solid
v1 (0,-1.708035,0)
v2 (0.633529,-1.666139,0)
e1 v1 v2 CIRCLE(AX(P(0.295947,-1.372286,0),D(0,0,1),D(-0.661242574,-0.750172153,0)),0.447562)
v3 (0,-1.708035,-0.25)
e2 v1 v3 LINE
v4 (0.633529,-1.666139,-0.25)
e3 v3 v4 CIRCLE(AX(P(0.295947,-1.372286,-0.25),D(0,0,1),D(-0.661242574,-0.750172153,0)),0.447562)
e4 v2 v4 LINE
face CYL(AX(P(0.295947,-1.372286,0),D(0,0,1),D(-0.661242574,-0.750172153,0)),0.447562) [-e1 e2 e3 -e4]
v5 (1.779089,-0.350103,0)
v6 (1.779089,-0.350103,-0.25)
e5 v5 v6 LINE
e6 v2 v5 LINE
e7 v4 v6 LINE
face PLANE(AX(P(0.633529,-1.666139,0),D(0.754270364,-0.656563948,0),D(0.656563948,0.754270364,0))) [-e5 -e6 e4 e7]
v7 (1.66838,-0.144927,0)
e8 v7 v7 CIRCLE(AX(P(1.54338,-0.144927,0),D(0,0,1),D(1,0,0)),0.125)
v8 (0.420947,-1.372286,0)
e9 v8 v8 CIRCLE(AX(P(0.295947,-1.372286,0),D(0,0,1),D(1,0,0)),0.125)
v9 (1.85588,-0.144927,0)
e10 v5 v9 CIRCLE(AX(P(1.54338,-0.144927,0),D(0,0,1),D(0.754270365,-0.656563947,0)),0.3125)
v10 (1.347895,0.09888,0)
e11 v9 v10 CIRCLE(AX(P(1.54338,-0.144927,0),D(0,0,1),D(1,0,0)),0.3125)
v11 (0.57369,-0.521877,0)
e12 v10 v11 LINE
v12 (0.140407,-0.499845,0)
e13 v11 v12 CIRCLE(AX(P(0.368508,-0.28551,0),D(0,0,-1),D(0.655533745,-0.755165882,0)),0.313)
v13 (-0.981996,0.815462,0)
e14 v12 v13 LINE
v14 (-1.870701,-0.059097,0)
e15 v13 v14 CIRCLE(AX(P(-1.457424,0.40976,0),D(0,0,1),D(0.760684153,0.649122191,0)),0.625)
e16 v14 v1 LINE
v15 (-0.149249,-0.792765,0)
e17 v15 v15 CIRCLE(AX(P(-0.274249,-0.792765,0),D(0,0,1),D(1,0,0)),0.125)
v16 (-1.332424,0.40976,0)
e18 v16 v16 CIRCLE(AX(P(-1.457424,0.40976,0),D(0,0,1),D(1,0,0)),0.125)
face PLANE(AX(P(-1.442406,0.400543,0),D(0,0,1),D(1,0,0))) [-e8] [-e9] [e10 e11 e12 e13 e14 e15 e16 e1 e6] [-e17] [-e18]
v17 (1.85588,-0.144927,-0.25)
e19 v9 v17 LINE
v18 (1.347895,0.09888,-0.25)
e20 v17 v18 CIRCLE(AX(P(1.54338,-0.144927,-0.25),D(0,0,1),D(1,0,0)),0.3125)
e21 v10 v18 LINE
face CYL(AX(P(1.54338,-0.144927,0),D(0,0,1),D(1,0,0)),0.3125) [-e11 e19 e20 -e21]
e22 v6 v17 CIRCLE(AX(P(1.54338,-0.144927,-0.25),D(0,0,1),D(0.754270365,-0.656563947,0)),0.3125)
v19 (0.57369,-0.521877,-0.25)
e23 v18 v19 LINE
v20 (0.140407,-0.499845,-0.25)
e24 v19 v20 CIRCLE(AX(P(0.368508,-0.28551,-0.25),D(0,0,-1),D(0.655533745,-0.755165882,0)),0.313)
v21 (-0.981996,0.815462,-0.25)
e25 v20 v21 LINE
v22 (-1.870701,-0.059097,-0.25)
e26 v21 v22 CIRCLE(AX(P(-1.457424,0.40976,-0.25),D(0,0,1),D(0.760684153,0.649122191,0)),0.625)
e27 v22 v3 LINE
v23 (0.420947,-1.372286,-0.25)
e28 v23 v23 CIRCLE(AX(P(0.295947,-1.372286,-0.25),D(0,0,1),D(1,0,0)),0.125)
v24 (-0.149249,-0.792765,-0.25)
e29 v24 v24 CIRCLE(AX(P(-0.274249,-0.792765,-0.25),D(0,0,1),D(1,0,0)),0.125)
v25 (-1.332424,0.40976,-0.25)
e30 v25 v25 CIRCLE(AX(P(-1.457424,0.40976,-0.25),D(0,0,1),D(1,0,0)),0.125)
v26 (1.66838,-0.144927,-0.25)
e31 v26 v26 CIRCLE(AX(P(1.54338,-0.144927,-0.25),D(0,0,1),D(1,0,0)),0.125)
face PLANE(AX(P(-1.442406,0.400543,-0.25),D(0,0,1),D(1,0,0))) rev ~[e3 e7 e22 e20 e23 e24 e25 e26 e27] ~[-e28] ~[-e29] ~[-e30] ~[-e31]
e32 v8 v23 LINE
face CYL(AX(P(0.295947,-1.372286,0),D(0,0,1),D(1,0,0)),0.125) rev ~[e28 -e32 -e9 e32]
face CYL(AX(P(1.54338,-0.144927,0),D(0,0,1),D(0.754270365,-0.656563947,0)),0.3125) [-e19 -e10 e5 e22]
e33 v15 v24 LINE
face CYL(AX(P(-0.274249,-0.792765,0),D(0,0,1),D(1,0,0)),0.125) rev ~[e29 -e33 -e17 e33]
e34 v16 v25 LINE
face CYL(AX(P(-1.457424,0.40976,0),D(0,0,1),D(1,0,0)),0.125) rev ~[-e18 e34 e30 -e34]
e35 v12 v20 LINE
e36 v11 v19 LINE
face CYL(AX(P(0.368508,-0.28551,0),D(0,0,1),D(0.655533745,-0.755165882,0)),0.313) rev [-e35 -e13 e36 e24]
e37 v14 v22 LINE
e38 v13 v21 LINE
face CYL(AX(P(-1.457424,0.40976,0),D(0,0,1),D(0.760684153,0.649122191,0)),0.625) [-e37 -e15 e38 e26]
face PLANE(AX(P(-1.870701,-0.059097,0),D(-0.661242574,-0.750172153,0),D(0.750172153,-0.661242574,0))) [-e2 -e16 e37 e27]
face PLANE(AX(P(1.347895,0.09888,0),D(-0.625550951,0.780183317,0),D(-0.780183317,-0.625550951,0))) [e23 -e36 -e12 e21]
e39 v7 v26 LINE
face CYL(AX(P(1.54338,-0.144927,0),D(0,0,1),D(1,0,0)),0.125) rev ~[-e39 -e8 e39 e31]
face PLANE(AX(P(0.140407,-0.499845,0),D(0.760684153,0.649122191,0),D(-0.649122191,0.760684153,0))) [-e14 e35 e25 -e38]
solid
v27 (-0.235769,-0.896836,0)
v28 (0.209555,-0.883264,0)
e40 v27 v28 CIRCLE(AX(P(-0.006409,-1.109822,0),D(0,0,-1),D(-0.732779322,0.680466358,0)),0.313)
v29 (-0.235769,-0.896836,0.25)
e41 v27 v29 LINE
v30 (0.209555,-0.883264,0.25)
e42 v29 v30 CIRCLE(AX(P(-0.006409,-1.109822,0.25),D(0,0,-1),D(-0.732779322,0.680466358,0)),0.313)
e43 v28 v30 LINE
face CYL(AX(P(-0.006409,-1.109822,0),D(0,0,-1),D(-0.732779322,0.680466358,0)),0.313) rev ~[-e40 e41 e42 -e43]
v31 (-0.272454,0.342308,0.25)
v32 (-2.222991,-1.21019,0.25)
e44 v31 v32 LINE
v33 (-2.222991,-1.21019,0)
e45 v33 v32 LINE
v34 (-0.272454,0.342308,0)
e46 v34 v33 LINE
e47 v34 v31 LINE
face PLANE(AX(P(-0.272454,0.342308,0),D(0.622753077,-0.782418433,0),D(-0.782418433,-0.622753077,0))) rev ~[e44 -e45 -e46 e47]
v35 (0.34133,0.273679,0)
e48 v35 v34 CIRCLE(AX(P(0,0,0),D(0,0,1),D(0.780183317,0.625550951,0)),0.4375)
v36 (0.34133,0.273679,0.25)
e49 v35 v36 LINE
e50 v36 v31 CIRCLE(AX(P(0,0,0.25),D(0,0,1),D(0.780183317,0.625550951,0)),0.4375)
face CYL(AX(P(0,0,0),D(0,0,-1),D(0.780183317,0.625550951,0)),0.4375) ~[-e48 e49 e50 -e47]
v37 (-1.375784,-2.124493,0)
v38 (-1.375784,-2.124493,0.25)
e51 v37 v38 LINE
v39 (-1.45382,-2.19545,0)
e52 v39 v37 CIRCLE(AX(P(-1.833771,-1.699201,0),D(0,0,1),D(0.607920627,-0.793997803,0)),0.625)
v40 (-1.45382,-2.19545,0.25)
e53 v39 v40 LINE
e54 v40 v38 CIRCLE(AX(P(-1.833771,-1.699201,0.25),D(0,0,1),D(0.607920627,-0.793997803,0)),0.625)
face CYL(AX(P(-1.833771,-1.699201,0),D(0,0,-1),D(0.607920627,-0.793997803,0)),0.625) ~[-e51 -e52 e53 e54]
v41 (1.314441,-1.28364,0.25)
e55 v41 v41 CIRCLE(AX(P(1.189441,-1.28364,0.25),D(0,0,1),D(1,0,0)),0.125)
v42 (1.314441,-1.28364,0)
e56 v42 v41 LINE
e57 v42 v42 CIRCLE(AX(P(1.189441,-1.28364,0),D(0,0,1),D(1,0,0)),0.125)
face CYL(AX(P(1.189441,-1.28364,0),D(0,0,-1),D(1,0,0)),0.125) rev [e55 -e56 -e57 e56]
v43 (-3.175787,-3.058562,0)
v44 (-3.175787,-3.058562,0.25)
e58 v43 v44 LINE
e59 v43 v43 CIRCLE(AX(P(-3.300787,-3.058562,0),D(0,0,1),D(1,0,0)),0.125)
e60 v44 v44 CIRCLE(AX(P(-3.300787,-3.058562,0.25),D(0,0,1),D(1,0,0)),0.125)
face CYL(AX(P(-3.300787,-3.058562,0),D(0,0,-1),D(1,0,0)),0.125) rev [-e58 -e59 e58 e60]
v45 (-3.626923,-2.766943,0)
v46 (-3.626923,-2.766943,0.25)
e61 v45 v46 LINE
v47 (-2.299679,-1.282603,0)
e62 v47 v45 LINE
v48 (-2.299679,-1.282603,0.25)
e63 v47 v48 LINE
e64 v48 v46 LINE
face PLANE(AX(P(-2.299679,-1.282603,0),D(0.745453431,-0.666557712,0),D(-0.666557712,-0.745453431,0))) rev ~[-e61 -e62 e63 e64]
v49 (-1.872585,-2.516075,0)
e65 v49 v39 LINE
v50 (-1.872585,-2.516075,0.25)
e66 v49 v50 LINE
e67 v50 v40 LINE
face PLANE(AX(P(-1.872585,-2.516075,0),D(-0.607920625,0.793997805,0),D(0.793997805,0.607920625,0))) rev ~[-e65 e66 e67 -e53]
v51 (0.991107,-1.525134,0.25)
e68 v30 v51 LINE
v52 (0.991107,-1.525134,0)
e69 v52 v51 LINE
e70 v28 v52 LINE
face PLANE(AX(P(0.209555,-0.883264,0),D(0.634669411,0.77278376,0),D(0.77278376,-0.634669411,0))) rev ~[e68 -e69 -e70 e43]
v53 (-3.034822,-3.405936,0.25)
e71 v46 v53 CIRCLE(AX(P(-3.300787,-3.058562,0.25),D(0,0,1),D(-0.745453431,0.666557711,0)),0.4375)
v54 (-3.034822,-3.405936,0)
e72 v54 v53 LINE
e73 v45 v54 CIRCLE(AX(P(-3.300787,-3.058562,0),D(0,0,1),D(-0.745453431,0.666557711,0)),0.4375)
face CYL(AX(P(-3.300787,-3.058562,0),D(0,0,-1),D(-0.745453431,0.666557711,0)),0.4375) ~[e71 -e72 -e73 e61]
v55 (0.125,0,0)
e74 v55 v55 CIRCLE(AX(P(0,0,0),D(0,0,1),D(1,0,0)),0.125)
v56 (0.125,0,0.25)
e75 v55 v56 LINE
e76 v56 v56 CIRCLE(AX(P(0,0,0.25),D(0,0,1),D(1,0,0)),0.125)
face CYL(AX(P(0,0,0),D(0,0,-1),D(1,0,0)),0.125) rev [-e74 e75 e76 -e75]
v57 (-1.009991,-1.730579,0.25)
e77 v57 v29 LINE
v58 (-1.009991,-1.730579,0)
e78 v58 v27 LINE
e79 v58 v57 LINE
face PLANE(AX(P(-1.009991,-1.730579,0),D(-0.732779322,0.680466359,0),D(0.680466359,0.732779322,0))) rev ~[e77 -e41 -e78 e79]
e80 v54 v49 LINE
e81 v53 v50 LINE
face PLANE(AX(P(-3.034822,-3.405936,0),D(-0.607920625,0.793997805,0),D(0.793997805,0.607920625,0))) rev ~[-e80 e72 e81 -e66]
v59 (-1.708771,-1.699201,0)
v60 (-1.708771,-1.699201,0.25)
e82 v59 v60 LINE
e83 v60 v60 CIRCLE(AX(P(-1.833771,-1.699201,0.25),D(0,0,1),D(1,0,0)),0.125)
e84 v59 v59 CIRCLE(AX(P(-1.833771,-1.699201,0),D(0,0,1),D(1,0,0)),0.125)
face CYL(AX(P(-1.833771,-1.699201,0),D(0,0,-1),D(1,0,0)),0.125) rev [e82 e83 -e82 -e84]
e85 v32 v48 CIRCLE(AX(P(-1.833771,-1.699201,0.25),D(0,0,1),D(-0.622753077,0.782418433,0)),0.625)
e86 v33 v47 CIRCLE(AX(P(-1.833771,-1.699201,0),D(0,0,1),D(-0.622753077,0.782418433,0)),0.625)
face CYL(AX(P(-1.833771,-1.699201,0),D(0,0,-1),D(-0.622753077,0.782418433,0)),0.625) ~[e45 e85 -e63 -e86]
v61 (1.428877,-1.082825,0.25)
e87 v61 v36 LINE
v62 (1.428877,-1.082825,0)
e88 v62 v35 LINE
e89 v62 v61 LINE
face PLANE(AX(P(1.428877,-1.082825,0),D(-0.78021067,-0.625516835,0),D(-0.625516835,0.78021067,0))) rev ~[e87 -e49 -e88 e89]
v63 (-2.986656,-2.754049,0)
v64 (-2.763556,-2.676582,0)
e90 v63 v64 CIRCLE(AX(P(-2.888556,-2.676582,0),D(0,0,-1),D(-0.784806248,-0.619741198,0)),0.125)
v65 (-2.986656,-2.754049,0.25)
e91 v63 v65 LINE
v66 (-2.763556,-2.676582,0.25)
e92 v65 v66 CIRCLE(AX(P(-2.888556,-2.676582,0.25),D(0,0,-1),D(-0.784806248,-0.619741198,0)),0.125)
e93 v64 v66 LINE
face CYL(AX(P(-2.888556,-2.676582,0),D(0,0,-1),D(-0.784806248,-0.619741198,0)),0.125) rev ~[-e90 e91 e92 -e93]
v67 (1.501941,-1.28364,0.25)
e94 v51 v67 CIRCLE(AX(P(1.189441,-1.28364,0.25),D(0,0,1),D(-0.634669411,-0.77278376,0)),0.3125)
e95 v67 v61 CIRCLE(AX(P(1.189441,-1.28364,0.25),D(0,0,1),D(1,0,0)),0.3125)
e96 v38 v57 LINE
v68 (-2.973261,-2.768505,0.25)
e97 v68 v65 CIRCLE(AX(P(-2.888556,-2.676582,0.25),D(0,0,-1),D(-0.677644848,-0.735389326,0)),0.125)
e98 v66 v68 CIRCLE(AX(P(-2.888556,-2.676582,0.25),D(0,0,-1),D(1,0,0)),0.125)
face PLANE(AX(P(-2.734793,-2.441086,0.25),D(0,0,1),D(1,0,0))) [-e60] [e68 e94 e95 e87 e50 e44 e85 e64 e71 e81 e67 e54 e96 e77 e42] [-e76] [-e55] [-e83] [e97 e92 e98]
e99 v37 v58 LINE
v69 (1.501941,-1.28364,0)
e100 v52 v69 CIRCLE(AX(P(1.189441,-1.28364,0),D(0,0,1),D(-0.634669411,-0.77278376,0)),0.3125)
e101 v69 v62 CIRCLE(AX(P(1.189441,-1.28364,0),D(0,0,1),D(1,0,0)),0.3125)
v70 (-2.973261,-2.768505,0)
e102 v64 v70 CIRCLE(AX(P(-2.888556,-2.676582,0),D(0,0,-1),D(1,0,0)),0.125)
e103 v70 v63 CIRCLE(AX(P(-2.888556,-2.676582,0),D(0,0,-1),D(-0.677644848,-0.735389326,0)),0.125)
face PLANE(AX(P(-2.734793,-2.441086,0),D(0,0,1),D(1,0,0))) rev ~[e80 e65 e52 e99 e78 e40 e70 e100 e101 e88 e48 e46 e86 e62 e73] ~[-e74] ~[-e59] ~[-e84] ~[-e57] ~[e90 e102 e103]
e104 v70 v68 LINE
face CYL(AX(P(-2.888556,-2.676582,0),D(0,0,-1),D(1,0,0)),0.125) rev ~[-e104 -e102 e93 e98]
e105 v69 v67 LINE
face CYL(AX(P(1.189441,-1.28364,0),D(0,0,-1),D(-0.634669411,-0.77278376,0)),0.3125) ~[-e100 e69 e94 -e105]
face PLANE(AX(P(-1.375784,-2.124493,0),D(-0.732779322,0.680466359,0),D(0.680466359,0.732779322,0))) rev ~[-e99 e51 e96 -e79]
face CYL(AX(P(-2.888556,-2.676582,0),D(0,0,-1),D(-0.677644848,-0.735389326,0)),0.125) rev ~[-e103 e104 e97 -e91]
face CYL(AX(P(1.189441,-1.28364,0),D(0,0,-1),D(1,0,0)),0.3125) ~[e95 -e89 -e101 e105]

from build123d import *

# Parameters (mm, degrees)
F0_R     = 0.125
F1_DEPTH = 0.25
F2_R     = 0.125
F3_DEPTH = 0.25


# Not quite as in the source:
# - ends of sketch curves that miss each other by under 0.0002 mm in the source are joined


with BuildPart() as f1:
    # F0 (on Top) → F1 (new body)
    with BuildSketch(Plane.XY):
        with BuildLine():
            Line((-2.2996791372, -1.2826026726), (-3.6269232135, -2.7669432373))
            ThreePointArc((-3.6269232135, -2.7669432373), (-3.3095959941, -2.6211509221), (-2.9866564556, -2.7540494466))
            ThreePointArc((-2.9866564556, -2.7540494466), (-2.929558128, -2.5584979333), (-2.7635556745, -2.6765817968))
            ThreePointArc((-2.7635556745, -2.6765817968), (-2.8383720153, -2.7910658584), (-2.9732612801, -2.7685054629))
            ThreePointArc((-2.9732612801, -2.7685054629), (-2.8917036664, -2.9034596896), (-2.8632873376, -3.0585622361))
            ThreePointArc((-2.8632873376, -3.0585622361), (-2.9085080639, -3.2522713516), (-3.0348220642, -3.4059362756))
            Line((-3.0348220642, -3.4059362756), (-1.8725849919, -2.5160750152))
            Line((-1.8725849919, -2.5160750152), (-2.2590622172, -2.1571883185))
            ThreePointArc((-2.2590622172, -2.1571883185), (-2.4580978323, -1.7281958222), (-2.2996791372, -1.2826026726))
        make_face()
        with BuildLine():
            ThreePointArc((-2.9866564556, -2.7540494466), (-3.3095959941, -2.6211509221), (-3.6269232135, -2.7669432373))
            ThreePointArc((-3.6269232135, -2.7669432373), (-3.6216972176, -3.3559224535), (-3.0348220642, -3.4059362756))
            ThreePointArc((-3.0348220642, -3.4059362756), (-2.9085080639, -3.2522713516), (-2.8632873376, -3.0585622361))
            ThreePointArc((-2.8632873376, -3.0585622361), (-2.8917036664, -2.9034596896), (-2.9732612801, -2.7685054629))
            ThreePointArc((-2.9732612801, -2.7685054629), (-2.9802442117, -2.7615418589), (-2.9866564556, -2.7540494466))
        make_face()
        with Locations((-3.3007873376, -3.0585622361)):
            Circle(F0_R, mode=Mode.SUBTRACT)
        with BuildLine():
            Line((-0.2724544714, 0.3423080645), (-2.2229914165, -1.2101897215))
            ThreePointArc((-2.2229914165, -1.2101897215), (-1.7632079583, -1.0781973023), (-1.3447592224, -1.3099805689))
            Line((-1.3447592224, -1.3099805689), (-1.0099910743, -1.7305786829))
            Line((-1.0099910743, -1.7305786829), (-0.235769164, -0.8968360602))
            ThreePointArc((-0.235769164, -0.8968360602), (-0.0159442132, -0.796967297), (0.2095545573, -0.8832637821))
            Line((0.2095545573, -0.8832637821), (0.9911066788, -1.5251344451))
            ThreePointArc((0.9911066788, -1.5251344451), (0.967333205, -1.0638113252), (1.4288770162, -1.0828247256))
            Line((1.4288770162, -1.0828247256), (0.3413302011, 0.2736785411))
            ThreePointArc((0.3413302011, 0.2736785411), (0.4127579272, 0.1450418682), (0.4375, 0))
            ThreePointArc((0.4375, 0), (-0.1900097613, -0.3940844334), (-0.2724544714, 0.3423080645))
        make_face()
        with BuildLine():
            Line((-1.0099910743, -1.7305786829), (-1.3447592224, -1.3099805689))
            ThreePointArc((-1.3447592224, -1.3099805689), (-1.2437465061, -1.493054693), (-1.2087707431, -1.6992012423))
            ThreePointArc((-1.2087707431, -1.6992012423), (-1.2520204003, -1.9276559176), (-1.3757836668, -2.1244927164))
            Line((-1.3757836668, -2.1244927164), (-1.0099910743, -1.7305786829))
        make_face()
        with BuildLine():
            Line((-2.2590622172, -2.1571883185), (-1.8725849919, -2.5160750152))
            Line((-1.8725849919, -2.5160750152), (-1.4538203525, -2.1954498702))
            ThreePointArc((-1.4538203525, -2.1954498702), (-1.8634345266, -2.3234968933), (-2.2590622172, -2.1571883185))
        make_face()
        with BuildLine():
            ThreePointArc((1.5019408696, -1.2836395202), (1.4831073861, -1.1767927743), (1.4288770162, -1.0828247256))
            ThreePointArc((1.4288770162, -1.0828247256), (0.967333205, -1.0638113252), (0.9911066788, -1.5251344451))
            ThreePointArc((0.9911066788, -1.5251344451), (1.3230013716, -1.5661600368), (1.5019408696, -1.2836395202))
        make_face()
        with Locations((1.1894408696, -1.2836395202)):
            Circle(F0_R, mode=Mode.SUBTRACT)
        with BuildLine():
            ThreePointArc((0.3413302011, 0.2736785411), (0.0486155264, 0.434790502), (-0.2724544714, 0.3423080645))
            ThreePointArc((-0.2724544714, 0.3423080645), (-0.1900097613, -0.3940844334), (0.4375, 0))
            ThreePointArc((0.4375, 0), (0.4127579272, 0.1450418682), (0.3413302011, 0.2736785411))
        make_face()
        Circle(F0_R, mode=Mode.SUBTRACT)
        with BuildLine():
            ThreePointArc((-2.2229914165, -1.2101897215), (-2.2628655338, -1.2447756041), (-2.2996791372, -1.2826026726))
            ThreePointArc((-2.2996791372, -1.2826026726), (-2.4580978323, -1.7281958222), (-2.2590622172, -2.1571883185))
            ThreePointArc((-2.2590622172, -2.1571883185), (-1.8634345266, -2.3234968933), (-1.4538203525, -2.1954498702))
            ThreePointArc((-1.4538203525, -2.1954498702), (-1.4133025172, -2.161620393), (-1.3757836668, -2.1244927164))
            ThreePointArc((-1.3757836668, -2.1244927164), (-1.2520204003, -1.9276559176), (-1.2087707431, -1.6992012423))
            ThreePointArc((-1.2087707431, -1.6992012423), (-1.2437465061, -1.493054693), (-1.3447592224, -1.3099805689))
            ThreePointArc((-1.3447592224, -1.3099805689), (-1.7632079583, -1.0781973023), (-2.2229914165, -1.2101897215))
        make_face()
        with Locations((-1.8337707431, -1.6992012423)):
            Circle(F0_R, mode=Mode.SUBTRACT)
    extrude(amount=F1_DEPTH)


with BuildPart() as f3:
    # F2 (on Top) → F3 (new body)
    with BuildSketch(Plane.XY):
        with BuildLine():
            ThreePointArc((-1.870700672, -0.0590971542), (-1.200201281, -0.1598547273), (-0.8324240634, 0.4097604412))
            ThreePointArc((-0.8324240634, 0.4097604412), (-0.8710081498, 0.6259579813), (-0.9819964676, 0.8154618107))
            ThreePointArc((-0.9819964676, 0.8154618107), (-1.8958063533, 0.8552331878), (-1.870700672, -0.0590971542))
        make_face()
        with Locations((-1.4574240634, 0.4097604412)):
            Circle(F2_R, mode=Mode.SUBTRACT)
        with BuildLine():
            ThreePointArc((-0.9819964676, 0.8154618107), (-0.8710081498, 0.6259579813), (-0.8324240634, 0.4097604412))
            ThreePointArc((-0.8324240634, 0.4097604412), (-1.200201281, -0.1598547273), (-1.870700672, -0.0590971542))
            Line((-1.870700672, -0.0590971542), (0, -1.708034565))
            ThreePointArc((0, -1.708034565), (0.1117499025, -0.9643858319), (0.7435082666, -1.3722863692))
            ThreePointArc((0.7435082666, -1.3722863692), (0.7151127049, -1.529165986), (0.6335291351, -1.6661391338))
            Line((0.6335291351, -1.6661391338), (1.7790889936, -0.3501030424))
            ThreePointArc((1.7790889936, -0.3501030424), (1.3179886014, -0.3613874071), (1.3478948326, 0.0988804778))
            Line((1.3478948326, 0.0988804778), (0.5736895844, -0.5218772581))
            ThreePointArc((0.5736895844, -0.5218772581), (0.3526119109, -0.5981064496), (0.1404071565, -0.4998447095))
            Line((0.1404071565, -0.4998447095), (-0.9819964676, 0.8154618107))
        make_face()
        with Locations((-0.274249447, -0.7927647465)):
            Circle(F2_R, mode=Mode.SUBTRACT)
        with BuildLine():
            ThreePointArc((0.7435082666, -1.3722863692), (0.1117499025, -0.9643858319), (0, -1.708034565))
            ThreePointArc((0, -1.708034565), (0.3254795809, -1.8188724567), (0.6335291351, -1.6661391338))
            ThreePointArc((0.6335291351, -1.6661391338), (0.7151127049, -1.529165986), (0.7435082666, -1.3722863692))
        make_face()
        with Locations((0.2959467375, -1.3722863692)):
            Circle(F2_R, mode=Mode.SUBTRACT)
        with BuildLine():
            ThreePointArc((1.8558795048, -0.1449268086), (1.6785965339, 0.1368046327), (1.3478948326, 0.0988804778))
            ThreePointArc((1.3478948326, 0.0988804778), (1.3179886014, -0.3613874071), (1.7790889936, -0.3501030424))
            ThreePointArc((1.7790889936, -0.3501030424), (1.8360529279, -0.2544645527), (1.8558795048, -0.1449268086))
        make_face()
        with Locations((1.5433795048, -0.1449268086)):
            Circle(F2_R, mode=Mode.SUBTRACT)
    extrude(amount=-F3_DEPTH)


solid = Compound([f1.part, f3.part])
